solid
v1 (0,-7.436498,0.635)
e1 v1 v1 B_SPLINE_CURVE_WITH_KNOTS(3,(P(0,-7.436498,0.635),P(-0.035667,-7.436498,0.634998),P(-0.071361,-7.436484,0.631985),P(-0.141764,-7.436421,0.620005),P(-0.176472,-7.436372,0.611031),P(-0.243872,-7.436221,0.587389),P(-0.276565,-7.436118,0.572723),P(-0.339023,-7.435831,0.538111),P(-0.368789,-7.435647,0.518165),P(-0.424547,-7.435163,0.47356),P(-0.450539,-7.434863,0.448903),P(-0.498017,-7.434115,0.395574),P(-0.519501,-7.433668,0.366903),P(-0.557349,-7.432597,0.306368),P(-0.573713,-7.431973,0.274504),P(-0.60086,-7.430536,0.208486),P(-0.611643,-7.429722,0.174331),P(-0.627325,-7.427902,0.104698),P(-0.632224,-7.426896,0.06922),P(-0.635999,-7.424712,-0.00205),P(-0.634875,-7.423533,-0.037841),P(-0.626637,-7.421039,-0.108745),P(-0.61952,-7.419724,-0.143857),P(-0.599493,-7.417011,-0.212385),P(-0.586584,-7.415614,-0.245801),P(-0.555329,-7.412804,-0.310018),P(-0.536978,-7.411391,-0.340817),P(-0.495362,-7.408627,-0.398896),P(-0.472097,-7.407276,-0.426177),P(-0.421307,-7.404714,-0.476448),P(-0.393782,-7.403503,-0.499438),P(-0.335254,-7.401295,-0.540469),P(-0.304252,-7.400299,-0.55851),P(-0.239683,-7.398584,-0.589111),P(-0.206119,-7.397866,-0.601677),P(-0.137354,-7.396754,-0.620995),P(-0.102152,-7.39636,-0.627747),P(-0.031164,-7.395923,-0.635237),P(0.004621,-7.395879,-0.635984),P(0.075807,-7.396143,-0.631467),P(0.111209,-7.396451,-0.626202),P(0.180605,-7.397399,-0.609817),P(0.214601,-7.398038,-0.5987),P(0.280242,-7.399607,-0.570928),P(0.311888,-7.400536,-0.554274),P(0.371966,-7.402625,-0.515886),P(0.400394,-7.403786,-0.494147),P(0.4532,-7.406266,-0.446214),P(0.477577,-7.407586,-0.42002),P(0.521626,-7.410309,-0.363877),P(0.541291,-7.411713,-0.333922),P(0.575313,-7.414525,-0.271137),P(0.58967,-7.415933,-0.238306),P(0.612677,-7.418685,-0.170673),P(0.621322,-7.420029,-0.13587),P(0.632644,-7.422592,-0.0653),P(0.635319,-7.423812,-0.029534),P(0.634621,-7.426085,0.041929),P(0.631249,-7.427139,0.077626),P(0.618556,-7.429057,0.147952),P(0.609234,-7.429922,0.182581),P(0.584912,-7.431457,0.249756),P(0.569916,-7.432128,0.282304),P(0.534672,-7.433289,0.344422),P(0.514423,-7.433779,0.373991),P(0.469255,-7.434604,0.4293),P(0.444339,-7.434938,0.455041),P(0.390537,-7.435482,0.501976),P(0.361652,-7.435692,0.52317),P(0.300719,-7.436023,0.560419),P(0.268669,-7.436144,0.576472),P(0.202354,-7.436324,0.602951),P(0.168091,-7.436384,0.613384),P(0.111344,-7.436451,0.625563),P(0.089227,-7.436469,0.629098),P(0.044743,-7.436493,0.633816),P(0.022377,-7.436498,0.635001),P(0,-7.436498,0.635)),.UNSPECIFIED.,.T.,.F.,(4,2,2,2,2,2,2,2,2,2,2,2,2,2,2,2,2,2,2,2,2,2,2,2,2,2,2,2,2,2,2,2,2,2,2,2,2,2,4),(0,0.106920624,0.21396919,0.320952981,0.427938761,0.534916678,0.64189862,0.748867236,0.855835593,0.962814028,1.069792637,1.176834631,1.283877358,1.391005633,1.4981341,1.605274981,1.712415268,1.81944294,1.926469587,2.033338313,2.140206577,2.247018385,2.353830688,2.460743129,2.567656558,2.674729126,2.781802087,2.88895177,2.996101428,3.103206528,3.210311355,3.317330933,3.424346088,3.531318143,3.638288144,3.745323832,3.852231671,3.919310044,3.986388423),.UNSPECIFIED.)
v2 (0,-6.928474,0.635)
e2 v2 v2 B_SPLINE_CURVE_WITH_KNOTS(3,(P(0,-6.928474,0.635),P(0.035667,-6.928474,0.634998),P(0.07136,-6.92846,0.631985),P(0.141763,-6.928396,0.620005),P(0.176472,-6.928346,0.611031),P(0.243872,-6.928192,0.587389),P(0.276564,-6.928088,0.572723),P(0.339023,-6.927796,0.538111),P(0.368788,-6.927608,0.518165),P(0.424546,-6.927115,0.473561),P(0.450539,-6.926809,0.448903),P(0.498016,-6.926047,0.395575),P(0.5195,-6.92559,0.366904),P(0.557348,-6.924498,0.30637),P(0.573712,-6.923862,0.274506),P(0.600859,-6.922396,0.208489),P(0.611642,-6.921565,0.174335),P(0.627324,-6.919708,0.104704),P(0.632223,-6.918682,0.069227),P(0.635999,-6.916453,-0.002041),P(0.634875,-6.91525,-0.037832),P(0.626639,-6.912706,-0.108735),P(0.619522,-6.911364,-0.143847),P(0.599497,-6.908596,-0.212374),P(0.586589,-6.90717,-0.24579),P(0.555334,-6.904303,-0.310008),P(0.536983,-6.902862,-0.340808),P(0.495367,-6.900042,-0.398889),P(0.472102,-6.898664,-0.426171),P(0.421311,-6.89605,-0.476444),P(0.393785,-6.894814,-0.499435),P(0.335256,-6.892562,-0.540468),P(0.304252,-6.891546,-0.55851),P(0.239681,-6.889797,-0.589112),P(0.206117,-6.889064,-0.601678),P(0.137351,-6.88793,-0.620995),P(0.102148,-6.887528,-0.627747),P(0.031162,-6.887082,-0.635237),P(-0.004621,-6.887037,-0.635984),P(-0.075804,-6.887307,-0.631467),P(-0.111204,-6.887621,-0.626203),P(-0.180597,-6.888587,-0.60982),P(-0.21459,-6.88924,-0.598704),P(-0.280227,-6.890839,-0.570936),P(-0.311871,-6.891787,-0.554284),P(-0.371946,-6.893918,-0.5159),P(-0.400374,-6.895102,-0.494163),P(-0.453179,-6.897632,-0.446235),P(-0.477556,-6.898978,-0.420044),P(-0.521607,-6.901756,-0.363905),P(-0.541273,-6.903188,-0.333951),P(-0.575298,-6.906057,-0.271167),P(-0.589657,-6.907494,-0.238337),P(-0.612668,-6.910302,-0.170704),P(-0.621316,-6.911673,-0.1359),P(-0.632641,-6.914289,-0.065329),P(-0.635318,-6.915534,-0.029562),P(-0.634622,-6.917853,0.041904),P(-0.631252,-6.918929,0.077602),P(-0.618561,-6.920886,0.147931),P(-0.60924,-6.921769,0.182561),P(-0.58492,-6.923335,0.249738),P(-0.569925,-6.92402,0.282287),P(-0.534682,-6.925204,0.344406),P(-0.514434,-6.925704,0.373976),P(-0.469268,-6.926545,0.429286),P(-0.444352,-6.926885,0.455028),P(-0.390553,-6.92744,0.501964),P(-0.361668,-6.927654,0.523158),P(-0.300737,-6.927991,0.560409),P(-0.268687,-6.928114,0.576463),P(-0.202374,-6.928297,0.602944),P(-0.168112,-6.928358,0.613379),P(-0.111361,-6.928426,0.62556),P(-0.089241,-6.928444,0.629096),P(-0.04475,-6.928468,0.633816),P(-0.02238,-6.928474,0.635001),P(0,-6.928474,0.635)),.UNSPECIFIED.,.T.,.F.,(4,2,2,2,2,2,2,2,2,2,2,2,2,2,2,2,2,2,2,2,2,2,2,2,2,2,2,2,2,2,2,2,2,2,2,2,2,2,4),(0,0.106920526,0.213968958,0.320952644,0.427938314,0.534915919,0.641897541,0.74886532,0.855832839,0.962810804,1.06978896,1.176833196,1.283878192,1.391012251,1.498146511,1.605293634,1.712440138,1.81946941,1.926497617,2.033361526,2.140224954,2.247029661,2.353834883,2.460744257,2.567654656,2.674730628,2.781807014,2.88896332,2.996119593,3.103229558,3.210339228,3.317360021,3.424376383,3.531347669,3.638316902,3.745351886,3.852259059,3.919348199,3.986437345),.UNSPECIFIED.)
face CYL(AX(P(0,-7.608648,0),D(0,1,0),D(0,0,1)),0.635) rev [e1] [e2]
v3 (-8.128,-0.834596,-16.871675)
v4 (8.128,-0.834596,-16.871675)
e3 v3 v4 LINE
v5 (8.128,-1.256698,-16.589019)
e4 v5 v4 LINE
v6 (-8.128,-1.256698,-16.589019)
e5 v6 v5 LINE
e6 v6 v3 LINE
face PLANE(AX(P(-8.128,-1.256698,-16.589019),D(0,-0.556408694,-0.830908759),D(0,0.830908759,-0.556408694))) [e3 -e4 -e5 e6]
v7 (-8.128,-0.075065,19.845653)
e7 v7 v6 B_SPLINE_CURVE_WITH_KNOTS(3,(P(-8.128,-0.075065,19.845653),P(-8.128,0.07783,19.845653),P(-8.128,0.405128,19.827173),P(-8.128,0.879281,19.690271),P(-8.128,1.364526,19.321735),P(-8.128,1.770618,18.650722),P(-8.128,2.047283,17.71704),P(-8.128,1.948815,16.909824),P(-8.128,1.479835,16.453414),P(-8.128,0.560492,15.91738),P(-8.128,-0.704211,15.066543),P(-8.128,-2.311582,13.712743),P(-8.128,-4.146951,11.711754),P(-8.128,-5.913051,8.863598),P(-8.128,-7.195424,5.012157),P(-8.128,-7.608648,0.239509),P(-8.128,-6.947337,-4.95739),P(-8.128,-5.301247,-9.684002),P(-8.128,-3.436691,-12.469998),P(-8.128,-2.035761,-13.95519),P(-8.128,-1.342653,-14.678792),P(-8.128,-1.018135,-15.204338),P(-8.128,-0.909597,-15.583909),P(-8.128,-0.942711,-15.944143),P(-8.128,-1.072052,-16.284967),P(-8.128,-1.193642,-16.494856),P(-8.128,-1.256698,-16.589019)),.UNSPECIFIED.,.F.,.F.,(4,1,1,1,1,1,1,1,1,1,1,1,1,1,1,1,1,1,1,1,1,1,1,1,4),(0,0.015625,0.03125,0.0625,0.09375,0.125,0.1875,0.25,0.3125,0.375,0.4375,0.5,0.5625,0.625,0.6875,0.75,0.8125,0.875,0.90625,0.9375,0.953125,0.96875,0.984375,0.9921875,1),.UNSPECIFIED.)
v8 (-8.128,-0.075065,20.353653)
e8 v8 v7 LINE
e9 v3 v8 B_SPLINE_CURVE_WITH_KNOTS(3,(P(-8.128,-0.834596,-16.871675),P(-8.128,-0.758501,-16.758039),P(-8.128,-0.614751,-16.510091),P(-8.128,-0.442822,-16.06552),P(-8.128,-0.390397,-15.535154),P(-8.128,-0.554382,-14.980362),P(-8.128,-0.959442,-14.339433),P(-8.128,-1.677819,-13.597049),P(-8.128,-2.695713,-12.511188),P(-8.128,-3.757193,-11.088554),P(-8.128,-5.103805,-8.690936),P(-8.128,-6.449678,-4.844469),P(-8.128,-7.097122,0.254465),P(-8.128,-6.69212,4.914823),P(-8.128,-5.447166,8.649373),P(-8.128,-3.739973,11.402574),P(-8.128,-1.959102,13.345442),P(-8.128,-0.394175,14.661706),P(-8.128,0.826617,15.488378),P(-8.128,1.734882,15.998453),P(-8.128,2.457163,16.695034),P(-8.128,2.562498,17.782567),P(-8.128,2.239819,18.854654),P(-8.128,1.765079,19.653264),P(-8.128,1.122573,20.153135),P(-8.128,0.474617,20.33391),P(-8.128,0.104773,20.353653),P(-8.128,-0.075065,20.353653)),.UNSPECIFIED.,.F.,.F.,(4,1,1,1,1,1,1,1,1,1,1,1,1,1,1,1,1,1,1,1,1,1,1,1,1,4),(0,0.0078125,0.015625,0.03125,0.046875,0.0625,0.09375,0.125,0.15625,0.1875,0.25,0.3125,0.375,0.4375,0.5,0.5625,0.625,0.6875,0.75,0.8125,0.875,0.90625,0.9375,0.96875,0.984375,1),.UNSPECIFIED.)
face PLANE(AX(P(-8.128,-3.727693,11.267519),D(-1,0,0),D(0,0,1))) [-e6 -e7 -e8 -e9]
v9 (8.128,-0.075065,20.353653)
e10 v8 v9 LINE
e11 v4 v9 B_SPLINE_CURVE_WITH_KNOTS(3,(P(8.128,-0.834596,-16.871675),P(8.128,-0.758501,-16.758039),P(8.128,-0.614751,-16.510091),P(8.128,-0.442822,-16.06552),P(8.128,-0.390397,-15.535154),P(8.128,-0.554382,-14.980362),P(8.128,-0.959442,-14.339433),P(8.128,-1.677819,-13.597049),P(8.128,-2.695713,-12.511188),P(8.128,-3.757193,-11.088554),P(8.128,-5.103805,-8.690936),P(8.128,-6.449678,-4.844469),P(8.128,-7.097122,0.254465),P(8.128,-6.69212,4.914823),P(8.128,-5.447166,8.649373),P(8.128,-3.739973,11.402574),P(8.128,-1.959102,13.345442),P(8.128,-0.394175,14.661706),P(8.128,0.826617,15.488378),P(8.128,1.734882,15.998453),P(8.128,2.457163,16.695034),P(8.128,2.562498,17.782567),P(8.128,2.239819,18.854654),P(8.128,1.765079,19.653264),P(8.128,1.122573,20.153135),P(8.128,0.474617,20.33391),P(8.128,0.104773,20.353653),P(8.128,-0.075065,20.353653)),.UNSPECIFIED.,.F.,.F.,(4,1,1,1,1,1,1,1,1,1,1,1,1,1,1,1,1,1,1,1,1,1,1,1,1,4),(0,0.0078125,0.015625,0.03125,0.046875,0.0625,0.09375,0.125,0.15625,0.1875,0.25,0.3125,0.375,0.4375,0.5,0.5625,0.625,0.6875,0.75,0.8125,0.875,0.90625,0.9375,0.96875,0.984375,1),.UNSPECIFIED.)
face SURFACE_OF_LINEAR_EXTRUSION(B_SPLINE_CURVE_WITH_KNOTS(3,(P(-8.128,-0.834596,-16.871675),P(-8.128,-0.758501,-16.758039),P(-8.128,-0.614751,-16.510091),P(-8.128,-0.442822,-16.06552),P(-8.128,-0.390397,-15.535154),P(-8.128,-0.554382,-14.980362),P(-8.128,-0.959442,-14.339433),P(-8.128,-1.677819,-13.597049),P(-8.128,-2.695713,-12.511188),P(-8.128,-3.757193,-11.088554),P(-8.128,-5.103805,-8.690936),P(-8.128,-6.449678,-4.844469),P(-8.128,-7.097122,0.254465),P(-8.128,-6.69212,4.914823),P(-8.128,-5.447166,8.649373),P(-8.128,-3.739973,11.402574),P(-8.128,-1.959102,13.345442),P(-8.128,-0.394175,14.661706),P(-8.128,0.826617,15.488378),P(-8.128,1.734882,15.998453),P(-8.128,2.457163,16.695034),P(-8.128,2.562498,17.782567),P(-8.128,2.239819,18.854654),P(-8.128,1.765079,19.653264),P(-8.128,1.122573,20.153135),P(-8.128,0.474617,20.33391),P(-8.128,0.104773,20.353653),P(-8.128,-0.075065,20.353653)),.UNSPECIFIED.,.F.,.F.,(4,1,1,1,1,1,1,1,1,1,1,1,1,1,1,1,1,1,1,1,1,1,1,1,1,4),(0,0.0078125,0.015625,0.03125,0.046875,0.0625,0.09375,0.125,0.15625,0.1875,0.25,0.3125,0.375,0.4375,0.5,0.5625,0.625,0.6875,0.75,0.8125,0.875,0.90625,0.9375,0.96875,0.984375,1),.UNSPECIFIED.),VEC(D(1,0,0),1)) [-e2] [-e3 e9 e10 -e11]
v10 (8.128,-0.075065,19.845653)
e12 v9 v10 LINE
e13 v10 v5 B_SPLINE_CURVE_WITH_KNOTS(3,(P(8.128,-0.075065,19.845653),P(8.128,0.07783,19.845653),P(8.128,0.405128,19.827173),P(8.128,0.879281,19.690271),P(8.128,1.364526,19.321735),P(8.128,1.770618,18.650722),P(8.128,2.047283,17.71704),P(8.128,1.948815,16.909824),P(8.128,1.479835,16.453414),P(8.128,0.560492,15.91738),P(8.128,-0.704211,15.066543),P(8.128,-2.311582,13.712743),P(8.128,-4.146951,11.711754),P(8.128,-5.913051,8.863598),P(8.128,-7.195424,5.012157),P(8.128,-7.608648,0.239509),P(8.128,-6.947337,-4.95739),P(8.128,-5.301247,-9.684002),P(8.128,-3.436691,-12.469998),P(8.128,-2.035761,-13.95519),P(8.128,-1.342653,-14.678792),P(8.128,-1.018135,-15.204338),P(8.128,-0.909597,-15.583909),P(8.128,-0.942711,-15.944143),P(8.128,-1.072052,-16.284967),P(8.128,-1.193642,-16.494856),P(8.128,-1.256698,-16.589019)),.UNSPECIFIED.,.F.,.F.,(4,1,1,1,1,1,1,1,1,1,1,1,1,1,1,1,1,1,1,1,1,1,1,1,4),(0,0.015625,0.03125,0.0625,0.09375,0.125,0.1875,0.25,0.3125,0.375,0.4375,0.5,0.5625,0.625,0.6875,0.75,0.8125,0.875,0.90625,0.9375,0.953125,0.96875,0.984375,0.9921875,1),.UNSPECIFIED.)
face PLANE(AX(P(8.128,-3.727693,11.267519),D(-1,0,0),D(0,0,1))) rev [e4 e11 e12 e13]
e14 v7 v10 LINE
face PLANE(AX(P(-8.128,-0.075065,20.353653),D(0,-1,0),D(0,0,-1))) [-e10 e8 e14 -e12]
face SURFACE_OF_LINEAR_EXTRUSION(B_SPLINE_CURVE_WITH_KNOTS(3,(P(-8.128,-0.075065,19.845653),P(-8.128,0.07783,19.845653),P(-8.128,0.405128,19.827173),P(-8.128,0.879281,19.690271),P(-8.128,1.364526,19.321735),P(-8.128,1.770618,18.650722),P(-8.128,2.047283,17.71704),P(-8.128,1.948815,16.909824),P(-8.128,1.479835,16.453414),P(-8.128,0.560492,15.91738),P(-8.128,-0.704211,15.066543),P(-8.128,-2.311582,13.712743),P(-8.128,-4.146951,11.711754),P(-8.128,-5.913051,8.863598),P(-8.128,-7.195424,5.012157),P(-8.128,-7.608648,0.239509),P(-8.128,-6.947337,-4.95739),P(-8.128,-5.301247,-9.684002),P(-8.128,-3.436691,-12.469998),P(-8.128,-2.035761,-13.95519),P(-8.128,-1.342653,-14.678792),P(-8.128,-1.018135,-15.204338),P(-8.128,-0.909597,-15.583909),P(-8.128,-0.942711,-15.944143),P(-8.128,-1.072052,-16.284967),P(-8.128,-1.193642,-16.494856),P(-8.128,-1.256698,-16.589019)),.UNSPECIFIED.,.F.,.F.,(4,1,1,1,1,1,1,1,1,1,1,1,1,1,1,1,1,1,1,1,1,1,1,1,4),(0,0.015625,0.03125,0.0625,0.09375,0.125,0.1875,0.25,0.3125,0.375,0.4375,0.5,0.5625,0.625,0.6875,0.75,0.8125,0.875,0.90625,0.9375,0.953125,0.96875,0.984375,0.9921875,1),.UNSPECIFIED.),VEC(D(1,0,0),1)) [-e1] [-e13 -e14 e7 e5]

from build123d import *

# Parameters (mm, degrees)
BOSS_EXTRUDE1_START = -8.128
BOSS_EXTRUDE1_DEPTH = 16.256
SKETCH2_R           = 0.635
CUT_EXTRUDE1_DEPTH  = 24.14392284


# Read off the part's stored shape, not the designer's step: Boss-Extrude1
with BuildPart() as part:
    # Boss-Extrude1 outline → Boss-Extrude1 (new body)
    with BuildSketch(Plane(origin=(0, 0, 0), x_dir=(0, 0, -1), z_dir=(1, 0, 0)).offset(BOSS_EXTRUDE1_START)):
        with BuildLine():
            Line((16.589019195, -1.256697512), (16.871674811, -0.834595863))
            add(Edge.make_bspline(
                [(16.871674811, -0.834595863), (16.758038505, -0.75850059), (16.51009055, -0.614751083), (16.065519539, -0.442822428), (15.535153537, -0.390397203), (14.980361869, -0.554381658), (14.339433306, -0.959441699), (13.597048531, -1.67781893), (12.511187531, -2.695713429), (11.088553964, -3.757193436), (8.690936178, -5.103805333), (4.844469034, -6.449678032), (-0.254465304, -7.097122263), (-4.914822622, -6.692120179), (-8.649373097, -5.447166211), (-11.402574344, -3.739972502), (-13.345441539, -1.959102206), (-14.6617064, -0.394174789), (-15.488377758, 0.826616531), (-15.998453091, 1.734881639), (-16.695033808, 2.457162767), (-17.782566836, 2.562498252), (-18.854653902, 2.239818945), (-19.653263902, 1.765078821), (-20.153134502, 1.122572764), (-20.333910082, 0.474617449), (-20.353652997, 0.104773323), (-20.353652997, -0.075064513)],
                knots=[0, 0, 0, 0, 0.0078125, 0.015625, 0.03125, 0.046875, 0.0625, 0.09375, 0.125, 0.15625, 0.1875, 0.25, 0.3125, 0.375, 0.4375, 0.5, 0.5625, 0.625, 0.6875, 0.75, 0.8125, 0.875, 0.90625, 0.9375, 0.96875, 0.984375, 1, 1, 1, 1], degree=3))
            Line((-20.353652997, -0.075064513), (-19.845652997, -0.075064513))
            add(Edge.make_bspline(
                [(-19.845652997, -0.075064513), (-19.845652997, 0.077830121), (-19.827172901, 0.405127673), (-19.690271072, 0.879281159), (-19.321735307, 1.364526452), (-18.650721916, 1.770618171), (-17.717040393, 2.047282514), (-16.90982415, 1.948815353), (-16.453414048, 1.479834818), (-15.917379729, 0.560492217), (-15.066542955, -0.704210581), (-13.712743047, -2.311581751), (-11.711754469, -4.146951197), (-8.863598265, -5.913050937), (-5.01215724, -7.195424043), (-0.239508784, -7.608648383), (4.957390091, -6.947336631), (9.684001968, -5.301246748), (12.469998284, -3.436691491), (13.955189729, -2.035761038), (14.678792005, -1.342652927), (15.204338255, -1.018135012), (15.583909243, -0.909597338), (15.944142542, -0.942711315), (16.284967473, -1.072052441), (16.494855689, -1.193641981), (16.589019195, -1.256697512)],
                knots=[0, 0, 0, 0, 0.015625, 0.03125, 0.0625, 0.09375, 0.125, 0.1875, 0.25, 0.3125, 0.375, 0.4375, 0.5, 0.5625, 0.625, 0.6875, 0.75, 0.8125, 0.875, 0.90625, 0.9375, 0.953125, 0.96875, 0.984375, 0.9921875, 1, 1, 1, 1], degree=3))
        make_face()
    extrude(amount=BOSS_EXTRUDE1_DEPTH)

    # Sketch2 → Cut-Extrude1 (cut, through all)
    with BuildSketch(Plane(origin=(0, 0, 0), x_dir=(1, 0, 0), z_dir=(0, 1, 0))):
        with Locations(Location((0, 0, 0), (0, 0, 270))):
            Circle(SKETCH2_R)
    extrude(amount=-CUT_EXTRUDE1_DEPTH, mode=Mode.SUBTRACT)


solid = part.part
